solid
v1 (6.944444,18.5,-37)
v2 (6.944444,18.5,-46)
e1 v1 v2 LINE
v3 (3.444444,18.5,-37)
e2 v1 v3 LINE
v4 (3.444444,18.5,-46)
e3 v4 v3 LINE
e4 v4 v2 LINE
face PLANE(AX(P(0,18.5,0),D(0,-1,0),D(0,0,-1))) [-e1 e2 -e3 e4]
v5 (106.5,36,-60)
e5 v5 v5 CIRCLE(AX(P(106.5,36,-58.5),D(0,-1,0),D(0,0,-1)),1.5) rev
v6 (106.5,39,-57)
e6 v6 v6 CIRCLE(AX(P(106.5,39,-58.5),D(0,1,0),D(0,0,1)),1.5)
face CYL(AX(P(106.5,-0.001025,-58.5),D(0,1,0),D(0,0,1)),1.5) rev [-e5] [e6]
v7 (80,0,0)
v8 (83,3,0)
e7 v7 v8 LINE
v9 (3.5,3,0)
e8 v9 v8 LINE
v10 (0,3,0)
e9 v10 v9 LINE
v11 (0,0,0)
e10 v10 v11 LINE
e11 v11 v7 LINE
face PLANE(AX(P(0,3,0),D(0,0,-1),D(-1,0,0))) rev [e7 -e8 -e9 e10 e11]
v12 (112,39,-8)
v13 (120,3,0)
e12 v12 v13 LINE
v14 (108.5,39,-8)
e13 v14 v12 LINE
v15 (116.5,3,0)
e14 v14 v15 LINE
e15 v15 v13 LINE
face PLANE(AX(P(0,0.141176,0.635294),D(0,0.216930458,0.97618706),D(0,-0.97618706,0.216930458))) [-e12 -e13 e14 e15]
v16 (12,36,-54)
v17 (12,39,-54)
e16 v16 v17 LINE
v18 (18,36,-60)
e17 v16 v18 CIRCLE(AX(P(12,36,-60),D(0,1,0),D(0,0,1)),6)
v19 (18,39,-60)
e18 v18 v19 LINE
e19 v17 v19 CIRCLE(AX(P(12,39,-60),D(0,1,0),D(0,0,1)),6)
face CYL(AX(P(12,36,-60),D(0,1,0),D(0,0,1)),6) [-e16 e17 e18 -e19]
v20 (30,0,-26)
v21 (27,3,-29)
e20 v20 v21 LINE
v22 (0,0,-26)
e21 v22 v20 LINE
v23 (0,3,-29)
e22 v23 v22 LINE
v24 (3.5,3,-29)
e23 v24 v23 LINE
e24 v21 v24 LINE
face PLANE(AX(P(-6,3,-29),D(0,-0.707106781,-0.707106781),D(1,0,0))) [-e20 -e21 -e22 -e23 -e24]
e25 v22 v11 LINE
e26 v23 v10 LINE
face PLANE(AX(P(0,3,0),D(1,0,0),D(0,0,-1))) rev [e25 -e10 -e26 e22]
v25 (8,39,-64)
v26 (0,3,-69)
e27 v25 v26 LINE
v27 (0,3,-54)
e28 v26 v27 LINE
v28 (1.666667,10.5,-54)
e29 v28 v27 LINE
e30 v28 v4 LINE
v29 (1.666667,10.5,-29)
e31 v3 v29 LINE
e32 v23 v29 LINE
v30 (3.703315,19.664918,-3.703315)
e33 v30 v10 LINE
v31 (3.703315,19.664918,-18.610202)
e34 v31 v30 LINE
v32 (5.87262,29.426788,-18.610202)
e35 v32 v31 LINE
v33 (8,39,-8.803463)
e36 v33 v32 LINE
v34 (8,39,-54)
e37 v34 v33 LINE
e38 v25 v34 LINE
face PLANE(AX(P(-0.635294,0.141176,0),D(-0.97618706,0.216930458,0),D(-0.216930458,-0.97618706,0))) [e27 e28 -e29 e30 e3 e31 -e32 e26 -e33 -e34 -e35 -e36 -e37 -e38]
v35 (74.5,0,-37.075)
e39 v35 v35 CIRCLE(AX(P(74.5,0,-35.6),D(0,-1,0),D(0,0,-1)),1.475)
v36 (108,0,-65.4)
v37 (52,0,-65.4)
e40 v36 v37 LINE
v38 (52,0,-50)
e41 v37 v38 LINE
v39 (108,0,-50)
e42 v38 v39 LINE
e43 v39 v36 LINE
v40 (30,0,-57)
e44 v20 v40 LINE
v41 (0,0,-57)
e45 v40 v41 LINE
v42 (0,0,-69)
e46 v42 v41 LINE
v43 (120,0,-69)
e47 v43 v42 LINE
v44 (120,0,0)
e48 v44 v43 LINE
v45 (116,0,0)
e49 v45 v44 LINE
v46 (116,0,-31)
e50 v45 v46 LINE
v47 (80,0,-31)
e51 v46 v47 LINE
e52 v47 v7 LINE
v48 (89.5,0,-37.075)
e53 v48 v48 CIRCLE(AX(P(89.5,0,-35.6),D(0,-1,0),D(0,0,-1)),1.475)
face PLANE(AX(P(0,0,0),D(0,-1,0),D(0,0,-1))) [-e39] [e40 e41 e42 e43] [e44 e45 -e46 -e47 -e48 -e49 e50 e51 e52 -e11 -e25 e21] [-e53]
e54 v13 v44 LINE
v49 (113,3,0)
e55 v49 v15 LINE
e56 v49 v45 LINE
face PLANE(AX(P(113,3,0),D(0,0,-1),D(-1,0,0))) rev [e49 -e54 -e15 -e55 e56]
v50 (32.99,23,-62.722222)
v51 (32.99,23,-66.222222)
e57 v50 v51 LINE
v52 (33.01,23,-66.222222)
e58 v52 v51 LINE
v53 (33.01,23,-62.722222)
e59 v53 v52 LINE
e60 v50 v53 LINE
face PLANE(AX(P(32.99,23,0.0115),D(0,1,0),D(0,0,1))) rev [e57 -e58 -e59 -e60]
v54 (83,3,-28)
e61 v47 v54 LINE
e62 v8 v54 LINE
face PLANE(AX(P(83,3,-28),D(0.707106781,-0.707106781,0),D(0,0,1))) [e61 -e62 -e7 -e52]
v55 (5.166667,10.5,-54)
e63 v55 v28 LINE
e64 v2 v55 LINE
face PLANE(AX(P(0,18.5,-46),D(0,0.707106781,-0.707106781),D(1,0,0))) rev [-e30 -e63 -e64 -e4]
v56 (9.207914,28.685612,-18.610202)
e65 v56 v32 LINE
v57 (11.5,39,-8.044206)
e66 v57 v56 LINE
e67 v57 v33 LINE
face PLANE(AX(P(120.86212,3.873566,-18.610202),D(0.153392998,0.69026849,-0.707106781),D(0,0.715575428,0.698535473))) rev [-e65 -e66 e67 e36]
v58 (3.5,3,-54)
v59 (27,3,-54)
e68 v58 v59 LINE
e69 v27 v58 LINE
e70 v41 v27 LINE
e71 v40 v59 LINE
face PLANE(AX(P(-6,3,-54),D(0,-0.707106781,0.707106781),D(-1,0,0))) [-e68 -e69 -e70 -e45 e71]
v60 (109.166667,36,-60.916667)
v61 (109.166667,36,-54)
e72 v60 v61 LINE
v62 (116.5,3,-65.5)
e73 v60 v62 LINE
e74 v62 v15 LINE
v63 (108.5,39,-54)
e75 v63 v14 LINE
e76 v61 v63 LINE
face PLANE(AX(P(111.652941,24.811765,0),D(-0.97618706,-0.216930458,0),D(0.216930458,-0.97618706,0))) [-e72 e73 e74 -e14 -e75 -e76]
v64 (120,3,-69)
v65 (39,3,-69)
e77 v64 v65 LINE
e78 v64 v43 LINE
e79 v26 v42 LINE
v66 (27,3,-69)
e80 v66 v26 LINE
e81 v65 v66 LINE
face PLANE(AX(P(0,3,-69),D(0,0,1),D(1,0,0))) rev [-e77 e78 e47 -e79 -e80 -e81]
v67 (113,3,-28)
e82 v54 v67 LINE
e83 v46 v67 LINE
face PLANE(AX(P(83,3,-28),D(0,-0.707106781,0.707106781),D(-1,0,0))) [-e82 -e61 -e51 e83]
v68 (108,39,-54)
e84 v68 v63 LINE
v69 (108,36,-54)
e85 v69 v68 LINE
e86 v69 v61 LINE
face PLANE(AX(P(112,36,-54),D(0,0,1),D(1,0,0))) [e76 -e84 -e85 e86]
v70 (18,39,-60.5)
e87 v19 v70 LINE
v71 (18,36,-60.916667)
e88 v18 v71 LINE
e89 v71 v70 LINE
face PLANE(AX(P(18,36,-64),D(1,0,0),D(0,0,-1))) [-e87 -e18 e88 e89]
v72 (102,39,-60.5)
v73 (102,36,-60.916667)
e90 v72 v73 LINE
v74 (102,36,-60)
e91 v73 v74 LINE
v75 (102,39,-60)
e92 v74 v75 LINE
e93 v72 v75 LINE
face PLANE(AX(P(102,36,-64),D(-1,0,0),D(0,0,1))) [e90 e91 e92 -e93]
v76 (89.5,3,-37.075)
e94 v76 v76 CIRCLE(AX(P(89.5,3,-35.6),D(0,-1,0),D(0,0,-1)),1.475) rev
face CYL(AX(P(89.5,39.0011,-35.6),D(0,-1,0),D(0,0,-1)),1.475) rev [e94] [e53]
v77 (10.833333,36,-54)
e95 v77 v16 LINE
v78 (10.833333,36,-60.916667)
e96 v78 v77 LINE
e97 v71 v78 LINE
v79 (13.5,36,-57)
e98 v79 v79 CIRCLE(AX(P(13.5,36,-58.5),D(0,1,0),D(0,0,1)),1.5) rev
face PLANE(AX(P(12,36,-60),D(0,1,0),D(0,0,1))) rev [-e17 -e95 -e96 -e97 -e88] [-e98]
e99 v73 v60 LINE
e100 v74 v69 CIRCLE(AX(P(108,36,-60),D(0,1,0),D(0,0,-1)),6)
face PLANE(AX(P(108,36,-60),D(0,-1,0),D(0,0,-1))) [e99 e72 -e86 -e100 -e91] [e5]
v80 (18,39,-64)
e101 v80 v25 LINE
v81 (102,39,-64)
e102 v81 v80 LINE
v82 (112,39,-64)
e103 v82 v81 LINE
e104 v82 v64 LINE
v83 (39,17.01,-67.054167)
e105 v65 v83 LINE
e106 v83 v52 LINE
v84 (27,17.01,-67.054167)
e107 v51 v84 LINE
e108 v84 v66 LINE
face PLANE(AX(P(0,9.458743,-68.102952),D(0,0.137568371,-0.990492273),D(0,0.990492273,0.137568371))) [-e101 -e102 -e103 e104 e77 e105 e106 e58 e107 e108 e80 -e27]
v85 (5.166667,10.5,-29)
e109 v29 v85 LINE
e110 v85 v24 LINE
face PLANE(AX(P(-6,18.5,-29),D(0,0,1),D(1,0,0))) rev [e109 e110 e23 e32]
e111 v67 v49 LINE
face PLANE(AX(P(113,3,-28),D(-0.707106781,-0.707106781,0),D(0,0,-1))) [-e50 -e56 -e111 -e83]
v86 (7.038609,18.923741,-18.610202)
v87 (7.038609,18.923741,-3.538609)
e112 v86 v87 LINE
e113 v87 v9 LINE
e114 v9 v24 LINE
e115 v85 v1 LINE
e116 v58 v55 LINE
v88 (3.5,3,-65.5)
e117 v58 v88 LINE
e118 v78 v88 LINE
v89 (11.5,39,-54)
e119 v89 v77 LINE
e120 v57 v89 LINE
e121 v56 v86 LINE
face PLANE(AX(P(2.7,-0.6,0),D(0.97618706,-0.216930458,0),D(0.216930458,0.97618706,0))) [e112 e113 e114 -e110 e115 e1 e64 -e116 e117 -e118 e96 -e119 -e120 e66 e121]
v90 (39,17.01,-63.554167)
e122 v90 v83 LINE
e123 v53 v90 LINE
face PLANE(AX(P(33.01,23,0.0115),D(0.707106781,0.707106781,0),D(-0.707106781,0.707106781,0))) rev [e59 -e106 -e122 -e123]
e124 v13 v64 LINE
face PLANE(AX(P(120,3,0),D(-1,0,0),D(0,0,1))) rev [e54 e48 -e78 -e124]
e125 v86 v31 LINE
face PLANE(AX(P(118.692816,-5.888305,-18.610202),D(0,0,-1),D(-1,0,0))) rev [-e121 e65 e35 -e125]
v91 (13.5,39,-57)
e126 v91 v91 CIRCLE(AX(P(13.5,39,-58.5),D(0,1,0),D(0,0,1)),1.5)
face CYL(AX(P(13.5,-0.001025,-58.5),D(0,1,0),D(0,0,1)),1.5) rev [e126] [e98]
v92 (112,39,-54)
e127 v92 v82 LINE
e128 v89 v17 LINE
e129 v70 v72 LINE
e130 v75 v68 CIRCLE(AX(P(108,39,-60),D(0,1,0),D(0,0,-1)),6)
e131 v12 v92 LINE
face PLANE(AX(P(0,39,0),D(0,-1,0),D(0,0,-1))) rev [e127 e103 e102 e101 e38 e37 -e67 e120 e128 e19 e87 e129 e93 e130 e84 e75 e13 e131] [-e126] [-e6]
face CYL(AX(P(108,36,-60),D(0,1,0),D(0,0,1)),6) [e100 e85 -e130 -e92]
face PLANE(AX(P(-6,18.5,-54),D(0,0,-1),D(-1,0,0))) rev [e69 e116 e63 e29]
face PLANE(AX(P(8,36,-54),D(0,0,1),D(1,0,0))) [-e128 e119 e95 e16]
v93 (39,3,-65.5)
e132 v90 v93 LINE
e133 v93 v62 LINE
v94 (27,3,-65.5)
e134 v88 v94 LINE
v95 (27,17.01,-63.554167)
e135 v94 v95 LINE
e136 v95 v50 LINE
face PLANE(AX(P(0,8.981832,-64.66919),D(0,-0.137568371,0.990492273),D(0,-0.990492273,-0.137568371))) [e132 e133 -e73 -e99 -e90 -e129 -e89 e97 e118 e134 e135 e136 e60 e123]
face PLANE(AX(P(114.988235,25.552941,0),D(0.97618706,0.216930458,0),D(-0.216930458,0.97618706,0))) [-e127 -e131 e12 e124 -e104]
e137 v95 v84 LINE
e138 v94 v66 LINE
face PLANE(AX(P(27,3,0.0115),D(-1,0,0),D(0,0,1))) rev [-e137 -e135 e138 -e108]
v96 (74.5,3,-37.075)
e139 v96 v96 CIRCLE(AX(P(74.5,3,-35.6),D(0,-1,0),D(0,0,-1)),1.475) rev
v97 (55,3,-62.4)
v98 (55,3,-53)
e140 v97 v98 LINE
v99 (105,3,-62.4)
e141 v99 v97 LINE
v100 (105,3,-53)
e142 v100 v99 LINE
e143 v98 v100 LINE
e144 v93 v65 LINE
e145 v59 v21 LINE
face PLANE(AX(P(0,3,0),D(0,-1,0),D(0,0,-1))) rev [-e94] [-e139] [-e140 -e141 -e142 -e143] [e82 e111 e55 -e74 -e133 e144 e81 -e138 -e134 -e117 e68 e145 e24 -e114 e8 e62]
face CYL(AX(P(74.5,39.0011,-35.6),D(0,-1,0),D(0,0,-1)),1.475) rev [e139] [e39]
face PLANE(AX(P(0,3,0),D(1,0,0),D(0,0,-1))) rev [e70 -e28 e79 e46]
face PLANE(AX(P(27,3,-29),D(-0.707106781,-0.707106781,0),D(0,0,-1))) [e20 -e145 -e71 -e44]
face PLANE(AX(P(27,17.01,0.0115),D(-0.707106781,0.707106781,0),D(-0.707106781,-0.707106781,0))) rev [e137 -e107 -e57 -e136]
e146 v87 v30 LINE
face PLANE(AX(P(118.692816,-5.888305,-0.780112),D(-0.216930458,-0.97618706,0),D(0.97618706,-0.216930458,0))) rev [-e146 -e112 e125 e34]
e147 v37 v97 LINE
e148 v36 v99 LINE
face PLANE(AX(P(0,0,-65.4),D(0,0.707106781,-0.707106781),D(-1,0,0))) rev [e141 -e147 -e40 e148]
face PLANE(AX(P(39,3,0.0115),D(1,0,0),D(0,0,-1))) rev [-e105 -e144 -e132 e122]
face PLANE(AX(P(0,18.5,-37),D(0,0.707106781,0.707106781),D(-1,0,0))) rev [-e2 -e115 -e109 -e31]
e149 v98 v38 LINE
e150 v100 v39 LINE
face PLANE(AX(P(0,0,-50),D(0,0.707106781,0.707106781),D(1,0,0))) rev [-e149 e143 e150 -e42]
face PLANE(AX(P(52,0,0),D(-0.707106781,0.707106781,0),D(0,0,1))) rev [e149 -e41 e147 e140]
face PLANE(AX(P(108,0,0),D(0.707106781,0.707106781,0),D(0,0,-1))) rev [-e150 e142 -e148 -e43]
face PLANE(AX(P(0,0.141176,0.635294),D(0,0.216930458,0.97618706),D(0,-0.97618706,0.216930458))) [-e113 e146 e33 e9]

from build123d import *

# Parameters (mm, degrees)
SKETCH2_W           = 50
SKETCH2_H           = 9.4
BOSS_EXTRUDE1_DEPTH = 3
BOSS_EXTRUDE2_DEPTH = 3
CUT_EXTRUDE1_REACH  = 145.812
SKETCH6_R           = 1.5
SKETCH7_W           = 33
SKETCH7_H           = 25
CUT_EXTRUDE2_DEPTH  = 18.5
CHAMFER1_SIZE       = 3
CUT_EXTRUDE4_REACH  = 145.812
CHAMFER2_SIZE       = 3
CHAMFER3_SIZE       = 3
CUT_EXTRUDE5_REACH  = 145.812
SKETCH9_R           = 1.475
CUT_EXTRUDE6_REACH  = 146.305
CHAMFER4_SIZE       = 8


with BuildPart() as part:
    # Sketch2 → Boss-Extrude1 (new body)
    with BuildSketch(Plane(origin=(0, 0, 0), x_dir=(1, 0, 0), z_dir=(0, 1, 0))):
        Polygon((113, 0), (120, 0), (120, 69), (0, 69), (0, 0), (83, 0), (83, 28), (113, 28), align=None)
        with Locations((80, 57.7)):
            Rectangle(SKETCH2_W, SKETCH2_H, mode=Mode.SUBTRACT)
    extrude(amount=BOSS_EXTRUDE1_DEPTH)

    # Sketch4 → Loft1 section 0
    with BuildSketch(Plane(origin=(0, 39, 0), x_dir=(1, 0, 0), z_dir=(0, 1, 0))):
        with BuildLine():
            Line((11.5, 8), (8, 8))
            Line((8, 8), (8, 64))
            Line((8, 64), (112, 64))
            Line((112, 64), (112, 8))
            Line((112, 8), (108.5, 8))
            Line((108.5, 8), (108.5, 60.5))
            Line((108.5, 60.5), (11.5, 60.5))
            Line((11.5, 60.5), (11.5, 8))
        make_face()
    # Sketch3 → Loft1 section 1
    with BuildSketch(Plane(origin=(0, 3, 0), x_dir=(1, 0, 0), z_dir=(0, 1, 0))):
        with BuildLine():
            Line((3.5, 0), (3.5, 65.5))
            Line((3.5, 65.5), (116.5, 65.5))
            Line((116.5, 65.5), (116.5, 0))
            Line((116.5, 0), (120, 0))
            Line((120, 0), (120, 69))
            Line((120, 69), (0, 69))
            Line((0, 69), (0, 0))
            Line((0, 0), (3.5, 0))
        make_face()
    loft()

    # Sketch5 → Boss-Extrude2 (add)
    with BuildSketch(Plane(origin=(0, 39, 0), x_dir=(1, 0, 0), z_dir=(0, 1, 0))):
        with BuildLine():
            Line((8, 64), (18, 64))
            Line((18, 64), (18, 60))
            ThreePointArc((18, 60), (16.242640687, 55.757359313), (12, 54))
            Line((12, 54), (8, 54))
            Line((8, 54), (8, 64))
        make_face()
        with BuildLine():
            Line((112, 64), (102, 64))
            Line((102, 64), (102, 60))
            ThreePointArc((102, 60), (103.757359313, 55.757359313), (108, 54))
            Line((108, 54), (112, 54))
            Line((112, 54), (112, 64))
        make_face()
    extrude(amount=-BOSS_EXTRUDE2_DEPTH)

    # Sketch6 → Cut-Extrude1 (cut, up to next)
    with BuildSketch(Plane(origin=(0, 39, 0), x_dir=(1, 0, 0), z_dir=(0, 1, 0)), mode=Mode.PRIVATE) as cut_extrude1_sk1:
        with Locations(Location((13.5, 58.5, 0), (0, 0, 270))):
            Circle(SKETCH6_R)
    cut_extrude1_tool1 = extrude(cut_extrude1_sk1.sketch, amount=-CUT_EXTRUDE1_REACH, mode=Mode.PRIVATE) & part.part
    # Sketch6 → Cut-Extrude1 (cut, up to next)
    with BuildSketch(Plane(origin=(0, 39, 0), x_dir=(1, 0, 0), z_dir=(0, 1, 0)), mode=Mode.PRIVATE) as cut_extrude1_sk2:
        with Locations(Location((106.5, 58.5, 0), (0, 0, 270))):
            Circle(SKETCH6_R)
    cut_extrude1_tool2 = extrude(cut_extrude1_sk2.sketch, amount=-CUT_EXTRUDE1_REACH, mode=Mode.PRIVATE) & part.part
    add(cut_extrude1_tool1.solids().sort_by_distance((13.5, 39, -58.5))[0], mode=Mode.SUBTRACT)
    add(cut_extrude1_tool2.solids().sort_by_distance((106.5, 39, -58.5))[0], mode=Mode.SUBTRACT)

    # Sketch7 → Cut-Extrude2 (cut)
    with BuildSketch(Plane.XZ):
        with Locations((10.5, -41.5)):
            Rectangle(SKETCH7_W, SKETCH7_H)
    extrude(amount=-CUT_EXTRUDE2_DEPTH, mode=Mode.SUBTRACT)

    # Chamfer1
    chamfer1_edges = [part.edges().sort_by_distance(p)[0] for p in [
        (55, 0, -57.7),
        (80, 0, -62.4),
        (105, 0, -57.7),
        (80, 0, -53),
    ]]
    chamfer(chamfer1_edges, length=CHAMFER1_SIZE - 0.0001)  # a hair under: the kernel refuses the full size

    # Cut-Extrude4: up to this plane
    cut_extrude4_end = Plane(origin=(0, 8.981831945, -64.669190008), z_dir=(0, -0.1375683712746883, 0.9904922731777515))
    # Sketch8 → Cut-Extrude4 (cut, up to the surface)
    with BuildSketch(Plane(origin=(0, 0, -69), x_dir=(-1, 0, 0), z_dir=(0, 0, -1)), mode=Mode.PRIVATE) as cut_extrude4_sk1:
        Polygon((-27, 3), (-39, 3), (-39, 17.01), (-33.01, 23), (-32.99, 23), (-27, 17.01), align=None)
    cut_extrude4_tool1 = split(extrude(cut_extrude4_sk1.sketch, amount=-CUT_EXTRUDE4_REACH, mode=Mode.PRIVATE), bisect_by=cut_extrude4_end, keep=Keep.BOTH, mode=Mode.PRIVATE)
    add(cut_extrude4_tool1.solids().sort_by_distance((33, 11.593178, -69))[0], mode=Mode.SUBTRACT)

    # Chamfer2
    chamfer2_edges = [part.edges().sort_by_distance(p)[0] for p in [
        (83, 0, -14),
        (113, 0, -14),
        (98, 0, -28),
    ]]
    chamfer(chamfer2_edges, length=CHAMFER2_SIZE - 0.0001)  # a hair under: the kernel refuses the full size

    # Chamfer3
    chamfer3_edges = [part.edges().sort_by_distance(p)[0] for p in [
        (13.5, 0, -54),
        (27, 0, -41.5),
        (13.5, 0, -29),
    ]]
    chamfer(chamfer3_edges, length=CHAMFER3_SIZE - 0.0001)  # a hair under: the kernel refuses the full size

    # Sketch9 → Cut-Extrude5 (cut, up to next)
    with BuildSketch(Plane.XZ, mode=Mode.PRIVATE) as cut_extrude5_sk1:
        with Locations(Location((89.5, -35.6, 0), (0, 0, 270))):
            Circle(SKETCH9_R)
    cut_extrude5_tool1 = extrude(cut_extrude5_sk1.sketch, amount=-CUT_EXTRUDE5_REACH, mode=Mode.PRIVATE) & part.part
    # Sketch9 → Cut-Extrude5 (cut, up to next)
    with BuildSketch(Plane.XZ, mode=Mode.PRIVATE) as cut_extrude5_sk2:
        with Locations(Location((74.5, -35.6, 0), (0, 0, 270))):
            Circle(SKETCH9_R)
    cut_extrude5_tool2 = extrude(cut_extrude5_sk2.sketch, amount=-CUT_EXTRUDE5_REACH, mode=Mode.PRIVATE) & part.part
    add(cut_extrude5_tool1.solids().sort_by_distance((89.5, 0, -35.6))[0], mode=Mode.SUBTRACT)
    add(cut_extrude5_tool2.solids().sort_by_distance((74.5, 0, -35.6))[0], mode=Mode.SUBTRACT)

    # Sketch10 → Cut-Extrude6 (cut, up to next)
    with BuildSketch(Plane(origin=(-0.635294118, 0.141176471, 0), x_dir=(0, 0, 1), z_dir=(-0.9761870601839528, 0.21693045781865627, 0)), mode=Mode.PRIVATE) as cut_extrude6_sk1:
        Polygon((-0.780111958, 20), (-18.610201871, 20), (-18.610201871, 30), (-7.717228125, 40.892973746), align=None)
    cut_extrude6_tool1 = extrude(cut_extrude6_sk1.sketch, amount=-CUT_EXTRUDE6_REACH, mode=Mode.PRIVATE) & part.part
    add(cut_extrude6_tool1.solids().sort_by_distance((5.377692, 27.199615, -10.380545))[0], mode=Mode.SUBTRACT)

    # Chamfer4
    chamfer4_edges = [part.edges().sort_by_distance(p)[0] for p in [
        (5.194444444, 18.5, -29),
        (5.194444444, 18.5, -54),
    ]]
    chamfer(chamfer4_edges, length=CHAMFER4_SIZE)


solid = part.part
